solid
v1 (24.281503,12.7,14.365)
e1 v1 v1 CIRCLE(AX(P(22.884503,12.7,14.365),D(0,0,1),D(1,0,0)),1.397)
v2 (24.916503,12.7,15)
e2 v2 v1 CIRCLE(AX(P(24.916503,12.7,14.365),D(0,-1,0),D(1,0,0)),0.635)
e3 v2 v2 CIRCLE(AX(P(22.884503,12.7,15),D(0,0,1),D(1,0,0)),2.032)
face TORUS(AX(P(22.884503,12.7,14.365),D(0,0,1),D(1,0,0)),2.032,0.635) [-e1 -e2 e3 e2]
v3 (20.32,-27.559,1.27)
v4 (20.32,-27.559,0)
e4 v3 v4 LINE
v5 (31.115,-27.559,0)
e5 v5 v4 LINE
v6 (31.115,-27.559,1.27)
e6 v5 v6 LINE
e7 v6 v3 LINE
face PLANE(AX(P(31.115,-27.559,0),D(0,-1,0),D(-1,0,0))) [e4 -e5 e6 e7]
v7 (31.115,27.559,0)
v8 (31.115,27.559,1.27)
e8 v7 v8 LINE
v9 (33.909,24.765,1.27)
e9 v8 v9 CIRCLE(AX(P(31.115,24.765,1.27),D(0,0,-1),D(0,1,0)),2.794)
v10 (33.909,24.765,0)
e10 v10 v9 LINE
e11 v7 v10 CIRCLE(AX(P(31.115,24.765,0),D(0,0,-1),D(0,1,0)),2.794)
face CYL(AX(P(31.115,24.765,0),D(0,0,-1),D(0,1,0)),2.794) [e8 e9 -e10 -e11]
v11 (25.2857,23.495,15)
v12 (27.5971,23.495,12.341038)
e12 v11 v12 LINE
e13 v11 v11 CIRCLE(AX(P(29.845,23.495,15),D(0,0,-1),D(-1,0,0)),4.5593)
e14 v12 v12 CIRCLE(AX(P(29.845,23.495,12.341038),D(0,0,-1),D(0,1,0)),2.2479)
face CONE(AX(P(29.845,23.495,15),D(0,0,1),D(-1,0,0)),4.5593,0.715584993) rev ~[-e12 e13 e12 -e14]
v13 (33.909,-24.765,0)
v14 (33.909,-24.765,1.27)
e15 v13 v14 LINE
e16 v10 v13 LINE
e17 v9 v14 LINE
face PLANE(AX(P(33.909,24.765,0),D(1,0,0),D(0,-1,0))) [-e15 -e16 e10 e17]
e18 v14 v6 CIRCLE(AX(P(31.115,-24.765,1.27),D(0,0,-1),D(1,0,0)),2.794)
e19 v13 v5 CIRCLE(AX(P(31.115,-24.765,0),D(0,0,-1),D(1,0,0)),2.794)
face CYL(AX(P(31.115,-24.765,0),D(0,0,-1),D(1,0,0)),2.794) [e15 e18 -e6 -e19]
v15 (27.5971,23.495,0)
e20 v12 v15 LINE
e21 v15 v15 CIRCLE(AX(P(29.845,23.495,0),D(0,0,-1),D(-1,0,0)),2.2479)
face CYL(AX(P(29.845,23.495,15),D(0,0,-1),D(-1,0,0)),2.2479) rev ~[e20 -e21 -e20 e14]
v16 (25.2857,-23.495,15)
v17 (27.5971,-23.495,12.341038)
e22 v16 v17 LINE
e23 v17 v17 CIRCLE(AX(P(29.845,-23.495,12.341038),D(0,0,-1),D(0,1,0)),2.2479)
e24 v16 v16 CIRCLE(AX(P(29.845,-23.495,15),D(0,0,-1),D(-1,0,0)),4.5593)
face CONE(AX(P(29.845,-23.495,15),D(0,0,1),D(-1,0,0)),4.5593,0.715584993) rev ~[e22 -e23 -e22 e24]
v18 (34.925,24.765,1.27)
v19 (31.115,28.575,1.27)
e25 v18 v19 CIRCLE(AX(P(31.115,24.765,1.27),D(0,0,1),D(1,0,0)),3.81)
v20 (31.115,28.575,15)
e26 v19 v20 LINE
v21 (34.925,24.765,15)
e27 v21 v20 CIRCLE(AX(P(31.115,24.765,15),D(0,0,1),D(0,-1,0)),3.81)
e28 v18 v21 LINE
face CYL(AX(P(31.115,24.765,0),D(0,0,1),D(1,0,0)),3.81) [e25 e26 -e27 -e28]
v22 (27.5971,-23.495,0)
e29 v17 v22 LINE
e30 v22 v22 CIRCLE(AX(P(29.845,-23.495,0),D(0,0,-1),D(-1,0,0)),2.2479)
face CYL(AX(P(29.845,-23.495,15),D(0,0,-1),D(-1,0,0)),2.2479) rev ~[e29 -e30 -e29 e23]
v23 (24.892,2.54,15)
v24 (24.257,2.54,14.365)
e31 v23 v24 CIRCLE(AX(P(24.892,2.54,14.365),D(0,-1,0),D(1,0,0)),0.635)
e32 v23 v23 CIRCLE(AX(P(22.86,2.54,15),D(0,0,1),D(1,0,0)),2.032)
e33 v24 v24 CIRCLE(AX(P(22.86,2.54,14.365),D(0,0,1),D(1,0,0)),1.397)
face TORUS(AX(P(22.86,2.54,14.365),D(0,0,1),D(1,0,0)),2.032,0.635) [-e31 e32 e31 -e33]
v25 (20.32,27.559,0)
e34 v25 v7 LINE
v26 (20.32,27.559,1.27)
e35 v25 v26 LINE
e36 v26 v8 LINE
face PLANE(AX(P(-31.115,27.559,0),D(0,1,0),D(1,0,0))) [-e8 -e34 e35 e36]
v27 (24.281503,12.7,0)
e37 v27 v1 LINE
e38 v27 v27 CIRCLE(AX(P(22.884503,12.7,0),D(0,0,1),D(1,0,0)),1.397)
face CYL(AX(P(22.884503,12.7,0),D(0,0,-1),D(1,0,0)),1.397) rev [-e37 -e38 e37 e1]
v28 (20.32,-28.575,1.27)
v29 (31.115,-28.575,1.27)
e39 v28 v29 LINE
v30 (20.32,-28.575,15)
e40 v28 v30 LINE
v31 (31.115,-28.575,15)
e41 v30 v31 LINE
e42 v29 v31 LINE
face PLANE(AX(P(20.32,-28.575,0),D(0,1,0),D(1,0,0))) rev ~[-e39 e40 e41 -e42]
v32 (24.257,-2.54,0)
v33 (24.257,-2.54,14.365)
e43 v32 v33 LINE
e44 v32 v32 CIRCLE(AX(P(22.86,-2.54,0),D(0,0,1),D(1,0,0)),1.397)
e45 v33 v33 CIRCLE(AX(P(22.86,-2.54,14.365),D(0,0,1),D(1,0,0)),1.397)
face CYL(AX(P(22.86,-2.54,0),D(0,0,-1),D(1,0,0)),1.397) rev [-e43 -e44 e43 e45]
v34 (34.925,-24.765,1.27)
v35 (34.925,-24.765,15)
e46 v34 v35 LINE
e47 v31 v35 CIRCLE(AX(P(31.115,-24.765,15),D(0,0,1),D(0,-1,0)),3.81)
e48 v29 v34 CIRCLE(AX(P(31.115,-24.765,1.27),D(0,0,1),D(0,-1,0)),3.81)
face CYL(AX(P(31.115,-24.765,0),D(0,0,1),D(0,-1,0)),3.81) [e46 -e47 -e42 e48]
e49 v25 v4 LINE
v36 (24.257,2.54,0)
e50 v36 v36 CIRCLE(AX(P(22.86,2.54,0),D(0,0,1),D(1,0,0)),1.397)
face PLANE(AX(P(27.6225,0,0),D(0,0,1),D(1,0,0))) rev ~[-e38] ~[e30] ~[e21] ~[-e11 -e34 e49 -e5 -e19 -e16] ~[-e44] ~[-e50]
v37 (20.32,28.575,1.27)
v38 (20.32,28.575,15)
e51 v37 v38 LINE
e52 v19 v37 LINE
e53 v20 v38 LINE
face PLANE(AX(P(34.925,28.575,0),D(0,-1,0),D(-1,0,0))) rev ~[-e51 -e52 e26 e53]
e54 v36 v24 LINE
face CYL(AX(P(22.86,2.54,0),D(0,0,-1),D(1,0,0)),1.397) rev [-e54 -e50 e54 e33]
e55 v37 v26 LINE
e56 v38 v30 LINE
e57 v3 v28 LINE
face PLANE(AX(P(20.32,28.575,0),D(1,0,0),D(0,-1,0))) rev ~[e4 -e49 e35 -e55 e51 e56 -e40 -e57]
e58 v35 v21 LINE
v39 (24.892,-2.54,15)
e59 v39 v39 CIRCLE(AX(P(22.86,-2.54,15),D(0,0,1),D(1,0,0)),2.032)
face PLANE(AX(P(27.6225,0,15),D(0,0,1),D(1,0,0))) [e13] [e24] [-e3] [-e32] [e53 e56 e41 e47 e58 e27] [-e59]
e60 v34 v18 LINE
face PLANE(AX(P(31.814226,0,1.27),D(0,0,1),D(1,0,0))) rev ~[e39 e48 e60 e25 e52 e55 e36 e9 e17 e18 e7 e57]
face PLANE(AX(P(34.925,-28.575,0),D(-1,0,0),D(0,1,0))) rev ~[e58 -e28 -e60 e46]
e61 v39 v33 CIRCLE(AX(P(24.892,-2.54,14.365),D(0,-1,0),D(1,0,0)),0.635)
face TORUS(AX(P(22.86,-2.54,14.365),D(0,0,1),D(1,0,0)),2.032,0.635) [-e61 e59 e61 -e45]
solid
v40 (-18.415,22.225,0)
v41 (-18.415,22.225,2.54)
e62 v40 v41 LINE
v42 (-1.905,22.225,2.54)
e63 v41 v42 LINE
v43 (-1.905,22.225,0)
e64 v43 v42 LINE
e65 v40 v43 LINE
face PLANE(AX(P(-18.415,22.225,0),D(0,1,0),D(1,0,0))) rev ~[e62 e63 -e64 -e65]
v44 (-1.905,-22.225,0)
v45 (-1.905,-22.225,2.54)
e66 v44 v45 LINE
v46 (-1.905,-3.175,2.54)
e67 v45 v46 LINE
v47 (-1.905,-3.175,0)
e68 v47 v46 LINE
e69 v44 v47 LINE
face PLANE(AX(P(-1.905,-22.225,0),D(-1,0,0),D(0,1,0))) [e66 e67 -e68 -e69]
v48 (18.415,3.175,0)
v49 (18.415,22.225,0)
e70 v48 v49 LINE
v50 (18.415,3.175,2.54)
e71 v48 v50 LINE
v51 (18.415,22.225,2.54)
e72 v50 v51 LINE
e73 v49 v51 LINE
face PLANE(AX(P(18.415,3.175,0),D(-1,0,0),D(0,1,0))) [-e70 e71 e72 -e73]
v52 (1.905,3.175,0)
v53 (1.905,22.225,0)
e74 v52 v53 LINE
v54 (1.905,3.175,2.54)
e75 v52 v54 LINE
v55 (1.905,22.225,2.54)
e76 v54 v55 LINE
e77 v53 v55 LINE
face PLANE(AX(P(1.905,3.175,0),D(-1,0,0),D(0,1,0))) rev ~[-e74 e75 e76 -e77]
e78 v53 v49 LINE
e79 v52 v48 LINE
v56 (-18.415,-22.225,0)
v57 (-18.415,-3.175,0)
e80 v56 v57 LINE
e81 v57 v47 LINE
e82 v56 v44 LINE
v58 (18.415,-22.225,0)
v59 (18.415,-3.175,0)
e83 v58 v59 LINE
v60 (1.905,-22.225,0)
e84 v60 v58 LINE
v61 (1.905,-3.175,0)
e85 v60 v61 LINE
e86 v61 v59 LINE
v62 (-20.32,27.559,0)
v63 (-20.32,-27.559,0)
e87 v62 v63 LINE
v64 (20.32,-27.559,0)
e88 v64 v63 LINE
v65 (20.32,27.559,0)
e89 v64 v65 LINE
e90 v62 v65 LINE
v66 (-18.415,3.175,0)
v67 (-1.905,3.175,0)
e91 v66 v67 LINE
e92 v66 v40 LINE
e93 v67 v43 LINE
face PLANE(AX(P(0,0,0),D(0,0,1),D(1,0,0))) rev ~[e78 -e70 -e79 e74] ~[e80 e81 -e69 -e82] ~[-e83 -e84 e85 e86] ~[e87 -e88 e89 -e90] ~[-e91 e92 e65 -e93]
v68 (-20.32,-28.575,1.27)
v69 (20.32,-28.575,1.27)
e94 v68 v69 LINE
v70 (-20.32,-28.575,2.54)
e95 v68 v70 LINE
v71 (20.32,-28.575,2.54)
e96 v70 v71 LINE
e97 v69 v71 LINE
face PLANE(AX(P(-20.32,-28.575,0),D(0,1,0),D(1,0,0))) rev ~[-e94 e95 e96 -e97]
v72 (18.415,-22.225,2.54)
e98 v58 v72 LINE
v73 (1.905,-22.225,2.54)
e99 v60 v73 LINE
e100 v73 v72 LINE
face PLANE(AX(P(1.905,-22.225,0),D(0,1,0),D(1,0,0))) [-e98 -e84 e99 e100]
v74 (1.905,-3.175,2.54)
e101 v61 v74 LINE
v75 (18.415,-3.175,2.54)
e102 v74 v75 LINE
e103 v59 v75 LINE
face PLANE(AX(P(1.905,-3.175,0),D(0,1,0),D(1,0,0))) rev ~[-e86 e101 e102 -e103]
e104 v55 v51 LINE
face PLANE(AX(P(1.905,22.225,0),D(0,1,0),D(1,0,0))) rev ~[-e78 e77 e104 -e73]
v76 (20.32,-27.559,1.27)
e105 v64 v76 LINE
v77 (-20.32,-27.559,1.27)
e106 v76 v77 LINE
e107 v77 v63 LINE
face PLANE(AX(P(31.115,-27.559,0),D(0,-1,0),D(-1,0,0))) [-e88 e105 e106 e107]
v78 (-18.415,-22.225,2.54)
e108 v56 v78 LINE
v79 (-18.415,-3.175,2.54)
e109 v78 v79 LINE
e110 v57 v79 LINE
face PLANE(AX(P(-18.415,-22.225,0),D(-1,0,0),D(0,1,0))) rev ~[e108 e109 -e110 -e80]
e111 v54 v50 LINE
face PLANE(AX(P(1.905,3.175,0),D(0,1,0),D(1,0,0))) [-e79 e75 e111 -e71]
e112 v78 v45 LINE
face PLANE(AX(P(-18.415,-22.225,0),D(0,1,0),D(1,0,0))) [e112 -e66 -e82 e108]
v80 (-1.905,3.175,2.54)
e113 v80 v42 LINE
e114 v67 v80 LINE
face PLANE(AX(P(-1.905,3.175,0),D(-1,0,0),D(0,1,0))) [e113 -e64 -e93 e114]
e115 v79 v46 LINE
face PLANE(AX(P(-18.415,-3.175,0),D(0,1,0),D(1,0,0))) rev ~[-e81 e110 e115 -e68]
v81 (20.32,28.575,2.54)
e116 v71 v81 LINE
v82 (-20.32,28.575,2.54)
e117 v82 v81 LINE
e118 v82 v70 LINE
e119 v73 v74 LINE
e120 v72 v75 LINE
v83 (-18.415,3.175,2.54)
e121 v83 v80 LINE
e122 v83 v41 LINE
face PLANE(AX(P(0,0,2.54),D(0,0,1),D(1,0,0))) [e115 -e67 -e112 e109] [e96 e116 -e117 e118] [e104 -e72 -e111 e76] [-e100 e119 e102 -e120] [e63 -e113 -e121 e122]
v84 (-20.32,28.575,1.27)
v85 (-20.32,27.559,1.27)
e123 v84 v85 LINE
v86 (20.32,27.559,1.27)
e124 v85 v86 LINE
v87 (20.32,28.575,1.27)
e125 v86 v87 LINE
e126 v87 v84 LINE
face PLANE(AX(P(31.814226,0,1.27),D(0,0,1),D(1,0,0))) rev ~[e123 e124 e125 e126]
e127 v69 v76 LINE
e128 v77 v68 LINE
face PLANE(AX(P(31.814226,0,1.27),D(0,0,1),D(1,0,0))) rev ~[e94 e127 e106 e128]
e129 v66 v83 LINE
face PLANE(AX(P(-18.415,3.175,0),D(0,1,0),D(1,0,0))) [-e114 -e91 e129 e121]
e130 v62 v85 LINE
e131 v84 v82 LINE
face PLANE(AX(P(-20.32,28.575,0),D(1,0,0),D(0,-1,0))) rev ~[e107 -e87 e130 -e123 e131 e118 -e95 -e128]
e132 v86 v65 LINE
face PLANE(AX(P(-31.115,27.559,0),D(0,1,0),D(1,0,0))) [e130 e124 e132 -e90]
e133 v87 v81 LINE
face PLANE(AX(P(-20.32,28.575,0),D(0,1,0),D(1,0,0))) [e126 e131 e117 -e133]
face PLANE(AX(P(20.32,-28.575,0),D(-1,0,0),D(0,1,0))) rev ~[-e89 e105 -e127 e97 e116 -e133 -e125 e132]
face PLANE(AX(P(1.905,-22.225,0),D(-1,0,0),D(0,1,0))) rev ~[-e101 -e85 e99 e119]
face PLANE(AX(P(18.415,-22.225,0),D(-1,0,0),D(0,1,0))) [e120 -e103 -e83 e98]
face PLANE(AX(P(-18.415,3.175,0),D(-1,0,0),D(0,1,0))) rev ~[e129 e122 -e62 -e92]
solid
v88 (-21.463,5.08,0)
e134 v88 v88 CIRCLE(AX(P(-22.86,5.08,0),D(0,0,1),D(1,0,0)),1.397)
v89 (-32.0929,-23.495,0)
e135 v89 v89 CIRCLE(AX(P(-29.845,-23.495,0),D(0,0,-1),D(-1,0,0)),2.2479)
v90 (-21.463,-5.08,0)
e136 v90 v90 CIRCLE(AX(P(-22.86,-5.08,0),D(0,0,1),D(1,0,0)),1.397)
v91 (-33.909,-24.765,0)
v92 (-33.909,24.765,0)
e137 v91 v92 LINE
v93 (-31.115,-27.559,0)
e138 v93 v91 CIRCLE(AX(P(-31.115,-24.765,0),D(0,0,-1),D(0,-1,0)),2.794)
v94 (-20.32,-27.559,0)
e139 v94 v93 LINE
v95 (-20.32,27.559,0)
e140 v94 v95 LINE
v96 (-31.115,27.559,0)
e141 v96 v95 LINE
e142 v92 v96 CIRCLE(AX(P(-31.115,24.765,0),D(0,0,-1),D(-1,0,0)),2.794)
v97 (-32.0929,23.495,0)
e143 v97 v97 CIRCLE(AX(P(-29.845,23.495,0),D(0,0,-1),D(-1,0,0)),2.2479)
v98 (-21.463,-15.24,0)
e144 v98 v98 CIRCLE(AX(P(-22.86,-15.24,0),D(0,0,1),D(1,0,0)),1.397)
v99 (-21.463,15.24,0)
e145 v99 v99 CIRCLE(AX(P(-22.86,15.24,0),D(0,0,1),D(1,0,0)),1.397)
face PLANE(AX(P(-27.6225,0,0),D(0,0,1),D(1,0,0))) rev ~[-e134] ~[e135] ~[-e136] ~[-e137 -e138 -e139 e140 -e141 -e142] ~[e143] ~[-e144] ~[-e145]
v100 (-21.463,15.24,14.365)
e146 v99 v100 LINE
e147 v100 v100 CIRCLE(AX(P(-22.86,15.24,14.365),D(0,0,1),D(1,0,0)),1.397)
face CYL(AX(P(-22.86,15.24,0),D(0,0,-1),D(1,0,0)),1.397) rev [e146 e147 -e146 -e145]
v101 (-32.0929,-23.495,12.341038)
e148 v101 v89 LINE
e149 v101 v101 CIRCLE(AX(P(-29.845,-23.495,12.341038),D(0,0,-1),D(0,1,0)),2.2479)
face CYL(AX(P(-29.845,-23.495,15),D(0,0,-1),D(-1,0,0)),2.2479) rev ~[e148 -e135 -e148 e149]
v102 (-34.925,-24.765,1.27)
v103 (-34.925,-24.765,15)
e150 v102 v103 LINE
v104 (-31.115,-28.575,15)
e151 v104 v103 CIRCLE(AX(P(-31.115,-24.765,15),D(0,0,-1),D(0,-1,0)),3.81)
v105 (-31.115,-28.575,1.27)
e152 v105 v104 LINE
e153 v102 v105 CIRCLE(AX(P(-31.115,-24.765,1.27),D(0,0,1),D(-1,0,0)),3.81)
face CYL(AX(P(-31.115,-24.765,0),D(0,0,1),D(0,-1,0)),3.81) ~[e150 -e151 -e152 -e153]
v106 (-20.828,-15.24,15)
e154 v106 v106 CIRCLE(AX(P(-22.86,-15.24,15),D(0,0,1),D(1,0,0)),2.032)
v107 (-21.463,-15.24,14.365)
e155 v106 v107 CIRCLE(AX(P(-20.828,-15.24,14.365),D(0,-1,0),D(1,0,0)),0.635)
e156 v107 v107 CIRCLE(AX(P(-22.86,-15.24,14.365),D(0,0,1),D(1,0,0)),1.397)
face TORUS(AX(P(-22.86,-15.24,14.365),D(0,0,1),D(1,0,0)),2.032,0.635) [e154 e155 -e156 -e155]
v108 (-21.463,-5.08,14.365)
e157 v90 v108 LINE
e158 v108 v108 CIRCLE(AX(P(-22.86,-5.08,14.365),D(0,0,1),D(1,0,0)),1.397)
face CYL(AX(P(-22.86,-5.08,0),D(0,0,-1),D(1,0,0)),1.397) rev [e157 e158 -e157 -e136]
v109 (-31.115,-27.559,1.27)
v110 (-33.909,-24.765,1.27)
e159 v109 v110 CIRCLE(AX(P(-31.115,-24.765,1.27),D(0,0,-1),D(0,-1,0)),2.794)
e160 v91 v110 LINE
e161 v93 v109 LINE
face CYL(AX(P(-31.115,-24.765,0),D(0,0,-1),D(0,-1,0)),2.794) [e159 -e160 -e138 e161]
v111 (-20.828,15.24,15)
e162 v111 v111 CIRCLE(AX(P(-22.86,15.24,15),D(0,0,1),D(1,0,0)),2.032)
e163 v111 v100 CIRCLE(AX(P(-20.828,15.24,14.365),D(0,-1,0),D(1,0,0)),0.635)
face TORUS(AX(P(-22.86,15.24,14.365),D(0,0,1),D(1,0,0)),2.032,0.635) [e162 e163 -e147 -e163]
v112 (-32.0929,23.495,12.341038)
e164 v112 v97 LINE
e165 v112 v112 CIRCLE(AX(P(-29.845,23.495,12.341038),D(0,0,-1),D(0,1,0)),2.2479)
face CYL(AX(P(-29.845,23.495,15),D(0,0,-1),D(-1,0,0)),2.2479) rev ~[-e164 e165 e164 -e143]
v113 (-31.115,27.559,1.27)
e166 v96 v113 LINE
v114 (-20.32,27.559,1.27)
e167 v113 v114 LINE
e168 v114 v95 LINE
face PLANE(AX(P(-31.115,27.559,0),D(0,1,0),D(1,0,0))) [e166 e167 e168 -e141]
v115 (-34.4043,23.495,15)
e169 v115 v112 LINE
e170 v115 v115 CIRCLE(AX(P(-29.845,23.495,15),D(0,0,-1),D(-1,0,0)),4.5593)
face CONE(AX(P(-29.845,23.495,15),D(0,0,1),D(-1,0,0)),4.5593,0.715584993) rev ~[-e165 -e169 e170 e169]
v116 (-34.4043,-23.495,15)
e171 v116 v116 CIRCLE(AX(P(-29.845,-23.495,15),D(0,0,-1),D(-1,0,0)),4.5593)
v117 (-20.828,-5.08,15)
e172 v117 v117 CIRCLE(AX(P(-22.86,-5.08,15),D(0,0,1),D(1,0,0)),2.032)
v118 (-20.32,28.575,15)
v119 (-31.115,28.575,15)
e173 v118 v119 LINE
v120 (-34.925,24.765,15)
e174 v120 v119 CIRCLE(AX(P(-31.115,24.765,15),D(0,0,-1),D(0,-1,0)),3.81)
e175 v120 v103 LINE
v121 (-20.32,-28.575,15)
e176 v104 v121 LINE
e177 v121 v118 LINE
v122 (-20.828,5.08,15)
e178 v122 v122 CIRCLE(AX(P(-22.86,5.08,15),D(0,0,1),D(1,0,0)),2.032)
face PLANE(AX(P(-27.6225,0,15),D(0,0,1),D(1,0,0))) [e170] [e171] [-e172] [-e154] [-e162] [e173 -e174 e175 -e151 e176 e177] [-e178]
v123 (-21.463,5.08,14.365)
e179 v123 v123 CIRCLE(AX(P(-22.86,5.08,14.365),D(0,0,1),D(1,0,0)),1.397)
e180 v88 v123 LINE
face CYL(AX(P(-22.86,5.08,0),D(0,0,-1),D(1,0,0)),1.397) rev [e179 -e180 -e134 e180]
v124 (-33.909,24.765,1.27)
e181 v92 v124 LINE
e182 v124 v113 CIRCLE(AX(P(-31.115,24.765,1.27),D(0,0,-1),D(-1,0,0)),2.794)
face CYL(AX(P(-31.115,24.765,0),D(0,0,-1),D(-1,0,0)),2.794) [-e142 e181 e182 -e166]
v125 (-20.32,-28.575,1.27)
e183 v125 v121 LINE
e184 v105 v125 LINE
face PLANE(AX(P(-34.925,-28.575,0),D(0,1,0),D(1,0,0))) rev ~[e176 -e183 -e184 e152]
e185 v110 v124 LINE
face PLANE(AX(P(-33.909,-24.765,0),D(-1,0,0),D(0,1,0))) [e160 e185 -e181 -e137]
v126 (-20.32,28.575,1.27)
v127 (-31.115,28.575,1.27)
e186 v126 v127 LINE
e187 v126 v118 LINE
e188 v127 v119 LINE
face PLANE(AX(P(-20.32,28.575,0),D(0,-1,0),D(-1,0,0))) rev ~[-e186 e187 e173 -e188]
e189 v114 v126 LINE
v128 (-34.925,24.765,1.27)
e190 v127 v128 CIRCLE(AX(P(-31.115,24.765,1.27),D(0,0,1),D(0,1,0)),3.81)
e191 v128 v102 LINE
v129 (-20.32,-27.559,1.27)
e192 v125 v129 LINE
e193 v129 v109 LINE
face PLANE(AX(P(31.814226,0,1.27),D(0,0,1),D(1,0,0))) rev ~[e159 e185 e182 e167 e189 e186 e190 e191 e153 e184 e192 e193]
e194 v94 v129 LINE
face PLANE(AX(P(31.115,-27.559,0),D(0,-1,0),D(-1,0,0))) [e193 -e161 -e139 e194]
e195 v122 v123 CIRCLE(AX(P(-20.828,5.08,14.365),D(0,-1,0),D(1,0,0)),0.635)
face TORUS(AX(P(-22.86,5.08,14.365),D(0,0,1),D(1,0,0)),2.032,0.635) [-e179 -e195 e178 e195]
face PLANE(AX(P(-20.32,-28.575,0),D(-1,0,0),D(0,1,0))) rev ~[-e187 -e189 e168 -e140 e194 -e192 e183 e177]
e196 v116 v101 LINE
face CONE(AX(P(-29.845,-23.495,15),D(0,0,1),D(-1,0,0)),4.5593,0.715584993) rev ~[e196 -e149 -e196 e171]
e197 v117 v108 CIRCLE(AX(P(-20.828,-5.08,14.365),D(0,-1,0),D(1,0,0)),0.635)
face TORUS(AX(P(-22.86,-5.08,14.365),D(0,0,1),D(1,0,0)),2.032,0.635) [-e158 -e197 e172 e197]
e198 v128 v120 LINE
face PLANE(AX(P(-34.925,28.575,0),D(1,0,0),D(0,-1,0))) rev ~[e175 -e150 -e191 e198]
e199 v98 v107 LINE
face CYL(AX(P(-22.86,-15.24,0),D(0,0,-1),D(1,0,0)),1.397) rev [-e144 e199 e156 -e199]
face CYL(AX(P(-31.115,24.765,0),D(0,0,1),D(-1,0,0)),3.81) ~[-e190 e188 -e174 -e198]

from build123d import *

# Parameters (mm, degrees)
F0_R             = 1.397
F1_DEPTH         = 15
F0_W             = 40.64
F0_H             = 51.3
F0_W_2           = 16.51
F0_H_2           = 19.05
F0_H_3           = 2.925
F2_DEPTH         = 2.54
F3_R             = 3.81
F3_2_R           = 3.81
F4_R             = 0.635
F4_2_R           = 0.635
F7_D             = 4.4958
F7_CSINK_D       = 9.1186
F7_CSINK_ANGLE   = 82
F7_2_D           = 4.4958
F7_2_CSINK_D     = 9.1186
F7_2_CSINK_ANGLE = 82
F9_DEPTH         = 1.27


# Not quite as in the source:
# - a feature names something its author has since deleted; it is built from what else it names


with BuildPart() as f1:
    # F0 (on Top) → F1 (new body)
    with BuildSketch(Plane.XY):
        Polygon((-34.925, -28.575), (-20.32, -28.575), (-20.32, -25.65), (-20.32, 25.65), (-20.32, 28.575), (-34.925, 28.575), align=None)
        with Locations((-22.86, -15.24)):
            Circle(F0_R, mode=Mode.SUBTRACT)
        with Locations((-22.86, -5.08)):
            Circle(F0_R, mode=Mode.SUBTRACT)
        with Locations((-22.86, 5.08)):
            Circle(F0_R, mode=Mode.SUBTRACT)
        with Locations((-22.86, 15.24)):
            Circle(F0_R, mode=Mode.SUBTRACT)
    extrude(amount=F1_DEPTH)

    # F3#2
    f3_2_edges = [f1.edges().sort_by_distance(p)[0] for p in [
        (-34.925, -28.575, 7.5),
        (-34.925, 28.575, 7.5),
    ]]
    fillet(f3_2_edges, radius=F3_2_R)

    # F4
    f4_edges = [f1.edges().sort_by_distance(p)[0] for p in [
        (-24.257, -15.24, 15),
        (-24.257, -5.08, 15),
        (-24.257, 5.08, 15),
        (-24.257, 15.24, 15),
    ]]
    fillet(f4_edges, radius=F4_R)

    # F7 (through all)
    with Locations(Plane.XY.offset(15)):
        with Locations((29.845, -23.495), (29.845, 23.495), (-29.845, 23.495), (-29.845, -23.495)):
            CounterSinkHole(F7_D / 2, F7_CSINK_D / 2, counter_sink_angle=F7_CSINK_ANGLE)


with BuildPart() as f1b:
    # F0 (on Top) → F1, piece 2 (new body)
    with BuildSketch(Plane.XY):
        Polygon((20.32, -28.575), (34.925, -28.575), (34.925, 28.575), (20.32, 28.575), (20.32, 25.65), (20.32, -25.65), align=None)
        with Locations((22.86, -2.54)):
            Circle(F0_R, mode=Mode.SUBTRACT)
        with Locations((22.86, 2.54)):
            Circle(F0_R, mode=Mode.SUBTRACT)
        with Locations((22.8845030069, 12.7)):
            Circle(F0_R, mode=Mode.SUBTRACT)
    extrude(amount=F1_DEPTH)

    # F3
    f3_edges = [f1b.edges().sort_by_distance(p)[0] for p in [
        (34.925, -28.575, 7.5),
        (34.925, 28.575, 7.5),
    ]]
    fillet(f3_edges, radius=F3_R)

    # F4#2
    f4_2_edges = [f1b.edges().sort_by_distance(p)[0] for p in [
        (21.487503, 12.7, 15),
        (21.463, 2.54, 15),
        (21.463, -2.54, 15),
    ]]
    fillet(f4_2_edges, radius=F4_2_R)

    # F7#2 (through all)
    with Locations(Plane.XY.offset(15)):
        with Locations((29.845, -23.495), (29.845, 23.495), (-29.845, 23.495), (-29.845, -23.495)):
            CounterSinkHole(F7_2_D / 2, F7_2_CSINK_D / 2, counter_sink_angle=F7_2_CSINK_ANGLE)


with BuildPart() as f2:
    # F0 (on Top) → F2 (new body)
    with BuildSketch(Plane.XY):
        Rectangle(F0_W, F0_H)
        with Locations((-10.1600003028, -12.7)):
            Rectangle(F0_W_2, F0_H_2, mode=Mode.SUBTRACT)
        with Locations((10.16, -12.7)):
            Rectangle(F0_W_2, F0_H_2, mode=Mode.SUBTRACT)
        with Locations((-10.1600003028, 12.7)):
            Rectangle(F0_W_2, F0_H_2, mode=Mode.SUBTRACT)
        with Locations((10.16, 12.7)):
            Rectangle(F0_W_2, F0_H_2, mode=Mode.SUBTRACT)
        with Locations((0, -27.1125)):
            Rectangle(F0_W, F0_H_3)
        with Locations((0, 27.1125)):
            Rectangle(F0_W, F0_H_3)
    extrude(amount=F2_DEPTH)


with BuildPart() as f9_tool:
    # F8 (on face) → F9 (new body)
    with BuildSketch(Plane.XY):
        with BuildLine():
            Line((20.32, 27.559), (31.115, 27.559))
            ThreePointArc((31.115, 27.559), (33.0906563466, 26.7406563466), (33.909, 24.765))
            Line((33.909, 24.765), (33.909, -24.765))
            ThreePointArc((33.909, -24.765), (33.0906563466, -26.7406563466), (31.115, -27.559))
            Line((31.115, -27.559), (20.32, -27.559))
            Line((20.32, -27.559), (20.32, -28.575))
            Line((20.32, -28.575), (31.115, -28.575))
            ThreePointArc((31.115, -28.575), (33.8090768363, -27.4590768363), (34.925, -24.765))
            Line((34.925, -24.765), (34.925, 24.765))
            ThreePointArc((34.925, 24.765), (33.8090768363, 27.4590768363), (31.115, 28.575))
            Line((31.115, 28.575), (20.32, 28.575))
            Line((20.32, 28.575), (20.32, 27.559))
        make_face()
        with BuildLine():
            Line((-20.32, 27.559), (20.32, 27.559))
            Line((20.32, 27.559), (20.32, 28.575))
            Line((20.32, 28.575), (-20.32, 28.575))
            Line((-20.32, 28.575), (-31.115, 28.575))
            ThreePointArc((-31.115, 28.575), (-33.8090768363, 27.4590768363), (-34.925, 24.765))
            Line((-34.925, 24.765), (-34.925, -24.765))
            ThreePointArc((-34.925, -24.765), (-33.8090768363, -27.4590768363), (-31.115, -28.575))
            Line((-31.115, -28.575), (-20.32, -28.575))
            Line((-20.32, -28.575), (20.32, -28.575))
            Line((20.32, -28.575), (20.32, -27.559))
            Line((20.32, -27.559), (-20.32, -27.559))
            Line((-20.32, -27.559), (-31.115, -27.559))
            ThreePointArc((-31.115, -27.559), (-33.0906563466, -26.7406563466), (-33.909, -24.765))
            Line((-33.909, -24.765), (-33.909, 24.765))
            ThreePointArc((-33.909, 24.765), (-33.0906563466, 26.7406563466), (-31.115, 27.559))
            Line((-31.115, 27.559), (-20.32, 27.559))
        make_face()
    extrude(amount=F9_DEPTH)


with BuildPart() as f1_1:
    add(f1.part)

    # F9: cut by f9_tool
    add(f9_tool.part, mode=Mode.SUBTRACT)


with BuildPart() as f1b_1:
    add(f1b.part)

    # F9: cut by f9_tool
    add(f9_tool.part, mode=Mode.SUBTRACT)


with BuildPart() as f2_1:
    add(f2.part)

    # F9: cut by f9_tool
    add(f9_tool.part, mode=Mode.SUBTRACT)


solid = Compound([f1_1.part, f1b_1.part, f2_1.part])
